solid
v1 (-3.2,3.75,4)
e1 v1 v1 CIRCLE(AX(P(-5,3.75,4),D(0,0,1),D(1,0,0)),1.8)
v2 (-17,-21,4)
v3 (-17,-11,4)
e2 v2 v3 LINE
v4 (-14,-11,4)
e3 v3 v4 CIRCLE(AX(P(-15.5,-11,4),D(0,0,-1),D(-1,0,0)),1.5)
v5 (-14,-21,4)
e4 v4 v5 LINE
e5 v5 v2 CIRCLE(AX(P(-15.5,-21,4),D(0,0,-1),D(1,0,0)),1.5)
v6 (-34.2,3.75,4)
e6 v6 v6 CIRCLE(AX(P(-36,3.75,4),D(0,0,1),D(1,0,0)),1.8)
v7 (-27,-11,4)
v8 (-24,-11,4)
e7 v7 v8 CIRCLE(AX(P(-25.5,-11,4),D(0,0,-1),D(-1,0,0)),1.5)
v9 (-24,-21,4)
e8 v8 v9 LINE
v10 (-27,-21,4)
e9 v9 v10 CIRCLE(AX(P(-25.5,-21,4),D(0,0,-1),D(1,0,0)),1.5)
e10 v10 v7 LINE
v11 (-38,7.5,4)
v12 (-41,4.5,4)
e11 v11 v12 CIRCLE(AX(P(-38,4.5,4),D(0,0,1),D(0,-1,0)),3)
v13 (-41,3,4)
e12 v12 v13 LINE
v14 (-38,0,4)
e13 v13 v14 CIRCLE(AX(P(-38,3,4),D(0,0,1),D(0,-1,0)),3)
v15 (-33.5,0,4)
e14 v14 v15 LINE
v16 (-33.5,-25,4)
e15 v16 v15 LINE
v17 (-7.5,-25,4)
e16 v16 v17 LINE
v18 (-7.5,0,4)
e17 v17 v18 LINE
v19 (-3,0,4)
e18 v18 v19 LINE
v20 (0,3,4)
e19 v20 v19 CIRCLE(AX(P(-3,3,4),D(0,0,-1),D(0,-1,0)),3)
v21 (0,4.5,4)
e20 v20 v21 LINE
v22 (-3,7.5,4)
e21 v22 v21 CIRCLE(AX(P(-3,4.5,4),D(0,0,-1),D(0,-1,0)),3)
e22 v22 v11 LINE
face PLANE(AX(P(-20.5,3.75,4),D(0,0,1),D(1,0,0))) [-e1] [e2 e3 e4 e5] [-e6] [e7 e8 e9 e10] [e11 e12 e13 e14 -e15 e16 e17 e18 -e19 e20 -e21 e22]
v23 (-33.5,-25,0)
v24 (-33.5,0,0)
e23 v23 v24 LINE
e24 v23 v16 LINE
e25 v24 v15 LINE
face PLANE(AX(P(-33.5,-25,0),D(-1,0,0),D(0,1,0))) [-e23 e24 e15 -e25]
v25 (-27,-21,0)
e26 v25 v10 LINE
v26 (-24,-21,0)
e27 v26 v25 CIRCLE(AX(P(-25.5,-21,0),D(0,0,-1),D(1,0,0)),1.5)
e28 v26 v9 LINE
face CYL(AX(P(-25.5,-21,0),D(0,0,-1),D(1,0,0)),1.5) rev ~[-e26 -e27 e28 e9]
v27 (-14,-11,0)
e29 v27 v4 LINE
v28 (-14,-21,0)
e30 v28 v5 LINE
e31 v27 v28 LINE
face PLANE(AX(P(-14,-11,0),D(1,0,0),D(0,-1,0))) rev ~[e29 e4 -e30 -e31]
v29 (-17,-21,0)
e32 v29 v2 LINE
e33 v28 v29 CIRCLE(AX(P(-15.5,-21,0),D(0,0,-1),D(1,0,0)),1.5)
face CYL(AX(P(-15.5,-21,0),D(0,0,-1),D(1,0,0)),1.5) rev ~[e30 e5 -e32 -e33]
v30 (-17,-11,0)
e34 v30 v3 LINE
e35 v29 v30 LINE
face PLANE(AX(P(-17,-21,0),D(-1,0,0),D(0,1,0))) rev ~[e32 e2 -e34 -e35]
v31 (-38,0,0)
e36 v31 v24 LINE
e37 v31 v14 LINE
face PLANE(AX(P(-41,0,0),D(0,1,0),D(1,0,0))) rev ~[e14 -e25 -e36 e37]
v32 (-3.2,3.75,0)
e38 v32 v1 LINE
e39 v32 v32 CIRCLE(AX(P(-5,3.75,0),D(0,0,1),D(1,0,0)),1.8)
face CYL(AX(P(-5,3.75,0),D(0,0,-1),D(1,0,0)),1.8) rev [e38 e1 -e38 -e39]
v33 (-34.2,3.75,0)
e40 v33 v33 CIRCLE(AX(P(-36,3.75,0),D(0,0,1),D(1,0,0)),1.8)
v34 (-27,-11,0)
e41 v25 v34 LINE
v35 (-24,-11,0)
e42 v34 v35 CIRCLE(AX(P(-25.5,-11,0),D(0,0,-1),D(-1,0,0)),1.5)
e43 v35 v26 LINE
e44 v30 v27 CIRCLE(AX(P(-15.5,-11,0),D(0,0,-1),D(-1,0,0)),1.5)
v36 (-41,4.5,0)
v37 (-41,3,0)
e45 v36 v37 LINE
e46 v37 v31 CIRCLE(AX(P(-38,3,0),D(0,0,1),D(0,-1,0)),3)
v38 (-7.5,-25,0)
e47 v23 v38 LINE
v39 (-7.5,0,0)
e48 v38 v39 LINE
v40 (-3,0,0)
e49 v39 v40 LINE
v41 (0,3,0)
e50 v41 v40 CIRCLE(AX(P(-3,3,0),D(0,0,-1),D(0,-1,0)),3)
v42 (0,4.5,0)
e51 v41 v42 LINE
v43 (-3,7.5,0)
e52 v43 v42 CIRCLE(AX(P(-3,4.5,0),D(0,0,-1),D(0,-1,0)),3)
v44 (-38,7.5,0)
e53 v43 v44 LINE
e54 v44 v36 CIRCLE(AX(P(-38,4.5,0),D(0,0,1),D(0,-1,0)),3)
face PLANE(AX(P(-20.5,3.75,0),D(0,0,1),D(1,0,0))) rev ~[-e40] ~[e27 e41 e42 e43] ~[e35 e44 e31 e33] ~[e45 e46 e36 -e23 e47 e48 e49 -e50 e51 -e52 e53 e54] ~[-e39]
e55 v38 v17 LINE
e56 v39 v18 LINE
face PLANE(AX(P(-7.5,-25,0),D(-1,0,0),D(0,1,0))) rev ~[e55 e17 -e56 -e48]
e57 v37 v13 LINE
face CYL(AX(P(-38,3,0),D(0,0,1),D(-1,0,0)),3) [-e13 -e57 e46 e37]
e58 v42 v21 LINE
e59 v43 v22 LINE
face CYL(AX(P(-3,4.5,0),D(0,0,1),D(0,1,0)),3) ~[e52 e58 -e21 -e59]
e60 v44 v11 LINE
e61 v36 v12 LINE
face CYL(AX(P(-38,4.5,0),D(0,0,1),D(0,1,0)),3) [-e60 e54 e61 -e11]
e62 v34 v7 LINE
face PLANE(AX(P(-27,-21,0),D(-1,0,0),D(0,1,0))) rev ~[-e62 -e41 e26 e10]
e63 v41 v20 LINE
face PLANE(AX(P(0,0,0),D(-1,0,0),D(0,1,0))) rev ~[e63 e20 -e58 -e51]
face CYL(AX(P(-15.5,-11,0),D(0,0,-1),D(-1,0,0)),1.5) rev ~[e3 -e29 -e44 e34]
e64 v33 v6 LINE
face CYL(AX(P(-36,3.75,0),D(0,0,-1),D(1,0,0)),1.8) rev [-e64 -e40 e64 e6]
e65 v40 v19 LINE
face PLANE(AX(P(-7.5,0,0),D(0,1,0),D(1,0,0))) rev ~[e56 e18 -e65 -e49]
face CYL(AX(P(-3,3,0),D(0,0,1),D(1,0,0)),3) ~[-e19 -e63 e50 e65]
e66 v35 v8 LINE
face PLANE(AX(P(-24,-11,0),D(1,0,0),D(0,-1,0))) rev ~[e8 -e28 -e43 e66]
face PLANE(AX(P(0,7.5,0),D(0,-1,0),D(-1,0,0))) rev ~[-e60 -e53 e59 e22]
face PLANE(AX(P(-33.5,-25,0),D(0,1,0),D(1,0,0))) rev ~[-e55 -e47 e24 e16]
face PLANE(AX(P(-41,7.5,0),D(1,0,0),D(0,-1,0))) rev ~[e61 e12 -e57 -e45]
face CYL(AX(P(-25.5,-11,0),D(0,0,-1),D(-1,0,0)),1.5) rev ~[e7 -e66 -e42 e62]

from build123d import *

# Parameters (mm, degrees)
F0_R     = 1.8
F0_W     = 26
F0_H     = 25
F1_DEPTH = 4
F2_R     = 3


# Not quite as in the source:
# - a feature names something its author has since deleted; it is built from what else it names


with BuildPart() as f1:
    # F0 (on Top) → F1 (new body)
    with BuildSketch(Plane.XY):
        Polygon((0, 7.5), (-41, 7.5), (-41, 0), (-33.5, 0), (-7.5, 0), (0, 0), align=None)
        with Locations((-36, 3.75)):
            Circle(F0_R, mode=Mode.SUBTRACT)
        with Locations((-5, 3.75)):
            Circle(F0_R, mode=Mode.SUBTRACT)
        with Locations((-20.5, -12.5)):
            Rectangle(F0_W, F0_H)
        with BuildLine():
            Line((-27, -21), (-27, -11))
            ThreePointArc((-27, -11), (-25.5, -9.5), (-24, -11))
            Line((-24, -11), (-24, -21))
            ThreePointArc((-24, -21), (-25.5, -22.5), (-27, -21))
        make_face(mode=Mode.SUBTRACT)
        with BuildLine():
            Line((-17, -21), (-17, -11))
            ThreePointArc((-17, -11), (-15.5, -9.5), (-14, -11))
            Line((-14, -11), (-14, -21))
            ThreePointArc((-14, -21), (-15.5, -22.5), (-17, -21))
        make_face(mode=Mode.SUBTRACT)
    extrude(amount=F1_DEPTH)

    # F2
    f2_edges = [f1.edges().sort_by_distance(p)[0] for p in [
        (0, 0, 2),
        (0, 7.5, 2),
        (-41, 0, 2),
        (-41, 7.5, 2),
    ]]
    fillet(f2_edges, radius=F2_R)


solid = f1.part
